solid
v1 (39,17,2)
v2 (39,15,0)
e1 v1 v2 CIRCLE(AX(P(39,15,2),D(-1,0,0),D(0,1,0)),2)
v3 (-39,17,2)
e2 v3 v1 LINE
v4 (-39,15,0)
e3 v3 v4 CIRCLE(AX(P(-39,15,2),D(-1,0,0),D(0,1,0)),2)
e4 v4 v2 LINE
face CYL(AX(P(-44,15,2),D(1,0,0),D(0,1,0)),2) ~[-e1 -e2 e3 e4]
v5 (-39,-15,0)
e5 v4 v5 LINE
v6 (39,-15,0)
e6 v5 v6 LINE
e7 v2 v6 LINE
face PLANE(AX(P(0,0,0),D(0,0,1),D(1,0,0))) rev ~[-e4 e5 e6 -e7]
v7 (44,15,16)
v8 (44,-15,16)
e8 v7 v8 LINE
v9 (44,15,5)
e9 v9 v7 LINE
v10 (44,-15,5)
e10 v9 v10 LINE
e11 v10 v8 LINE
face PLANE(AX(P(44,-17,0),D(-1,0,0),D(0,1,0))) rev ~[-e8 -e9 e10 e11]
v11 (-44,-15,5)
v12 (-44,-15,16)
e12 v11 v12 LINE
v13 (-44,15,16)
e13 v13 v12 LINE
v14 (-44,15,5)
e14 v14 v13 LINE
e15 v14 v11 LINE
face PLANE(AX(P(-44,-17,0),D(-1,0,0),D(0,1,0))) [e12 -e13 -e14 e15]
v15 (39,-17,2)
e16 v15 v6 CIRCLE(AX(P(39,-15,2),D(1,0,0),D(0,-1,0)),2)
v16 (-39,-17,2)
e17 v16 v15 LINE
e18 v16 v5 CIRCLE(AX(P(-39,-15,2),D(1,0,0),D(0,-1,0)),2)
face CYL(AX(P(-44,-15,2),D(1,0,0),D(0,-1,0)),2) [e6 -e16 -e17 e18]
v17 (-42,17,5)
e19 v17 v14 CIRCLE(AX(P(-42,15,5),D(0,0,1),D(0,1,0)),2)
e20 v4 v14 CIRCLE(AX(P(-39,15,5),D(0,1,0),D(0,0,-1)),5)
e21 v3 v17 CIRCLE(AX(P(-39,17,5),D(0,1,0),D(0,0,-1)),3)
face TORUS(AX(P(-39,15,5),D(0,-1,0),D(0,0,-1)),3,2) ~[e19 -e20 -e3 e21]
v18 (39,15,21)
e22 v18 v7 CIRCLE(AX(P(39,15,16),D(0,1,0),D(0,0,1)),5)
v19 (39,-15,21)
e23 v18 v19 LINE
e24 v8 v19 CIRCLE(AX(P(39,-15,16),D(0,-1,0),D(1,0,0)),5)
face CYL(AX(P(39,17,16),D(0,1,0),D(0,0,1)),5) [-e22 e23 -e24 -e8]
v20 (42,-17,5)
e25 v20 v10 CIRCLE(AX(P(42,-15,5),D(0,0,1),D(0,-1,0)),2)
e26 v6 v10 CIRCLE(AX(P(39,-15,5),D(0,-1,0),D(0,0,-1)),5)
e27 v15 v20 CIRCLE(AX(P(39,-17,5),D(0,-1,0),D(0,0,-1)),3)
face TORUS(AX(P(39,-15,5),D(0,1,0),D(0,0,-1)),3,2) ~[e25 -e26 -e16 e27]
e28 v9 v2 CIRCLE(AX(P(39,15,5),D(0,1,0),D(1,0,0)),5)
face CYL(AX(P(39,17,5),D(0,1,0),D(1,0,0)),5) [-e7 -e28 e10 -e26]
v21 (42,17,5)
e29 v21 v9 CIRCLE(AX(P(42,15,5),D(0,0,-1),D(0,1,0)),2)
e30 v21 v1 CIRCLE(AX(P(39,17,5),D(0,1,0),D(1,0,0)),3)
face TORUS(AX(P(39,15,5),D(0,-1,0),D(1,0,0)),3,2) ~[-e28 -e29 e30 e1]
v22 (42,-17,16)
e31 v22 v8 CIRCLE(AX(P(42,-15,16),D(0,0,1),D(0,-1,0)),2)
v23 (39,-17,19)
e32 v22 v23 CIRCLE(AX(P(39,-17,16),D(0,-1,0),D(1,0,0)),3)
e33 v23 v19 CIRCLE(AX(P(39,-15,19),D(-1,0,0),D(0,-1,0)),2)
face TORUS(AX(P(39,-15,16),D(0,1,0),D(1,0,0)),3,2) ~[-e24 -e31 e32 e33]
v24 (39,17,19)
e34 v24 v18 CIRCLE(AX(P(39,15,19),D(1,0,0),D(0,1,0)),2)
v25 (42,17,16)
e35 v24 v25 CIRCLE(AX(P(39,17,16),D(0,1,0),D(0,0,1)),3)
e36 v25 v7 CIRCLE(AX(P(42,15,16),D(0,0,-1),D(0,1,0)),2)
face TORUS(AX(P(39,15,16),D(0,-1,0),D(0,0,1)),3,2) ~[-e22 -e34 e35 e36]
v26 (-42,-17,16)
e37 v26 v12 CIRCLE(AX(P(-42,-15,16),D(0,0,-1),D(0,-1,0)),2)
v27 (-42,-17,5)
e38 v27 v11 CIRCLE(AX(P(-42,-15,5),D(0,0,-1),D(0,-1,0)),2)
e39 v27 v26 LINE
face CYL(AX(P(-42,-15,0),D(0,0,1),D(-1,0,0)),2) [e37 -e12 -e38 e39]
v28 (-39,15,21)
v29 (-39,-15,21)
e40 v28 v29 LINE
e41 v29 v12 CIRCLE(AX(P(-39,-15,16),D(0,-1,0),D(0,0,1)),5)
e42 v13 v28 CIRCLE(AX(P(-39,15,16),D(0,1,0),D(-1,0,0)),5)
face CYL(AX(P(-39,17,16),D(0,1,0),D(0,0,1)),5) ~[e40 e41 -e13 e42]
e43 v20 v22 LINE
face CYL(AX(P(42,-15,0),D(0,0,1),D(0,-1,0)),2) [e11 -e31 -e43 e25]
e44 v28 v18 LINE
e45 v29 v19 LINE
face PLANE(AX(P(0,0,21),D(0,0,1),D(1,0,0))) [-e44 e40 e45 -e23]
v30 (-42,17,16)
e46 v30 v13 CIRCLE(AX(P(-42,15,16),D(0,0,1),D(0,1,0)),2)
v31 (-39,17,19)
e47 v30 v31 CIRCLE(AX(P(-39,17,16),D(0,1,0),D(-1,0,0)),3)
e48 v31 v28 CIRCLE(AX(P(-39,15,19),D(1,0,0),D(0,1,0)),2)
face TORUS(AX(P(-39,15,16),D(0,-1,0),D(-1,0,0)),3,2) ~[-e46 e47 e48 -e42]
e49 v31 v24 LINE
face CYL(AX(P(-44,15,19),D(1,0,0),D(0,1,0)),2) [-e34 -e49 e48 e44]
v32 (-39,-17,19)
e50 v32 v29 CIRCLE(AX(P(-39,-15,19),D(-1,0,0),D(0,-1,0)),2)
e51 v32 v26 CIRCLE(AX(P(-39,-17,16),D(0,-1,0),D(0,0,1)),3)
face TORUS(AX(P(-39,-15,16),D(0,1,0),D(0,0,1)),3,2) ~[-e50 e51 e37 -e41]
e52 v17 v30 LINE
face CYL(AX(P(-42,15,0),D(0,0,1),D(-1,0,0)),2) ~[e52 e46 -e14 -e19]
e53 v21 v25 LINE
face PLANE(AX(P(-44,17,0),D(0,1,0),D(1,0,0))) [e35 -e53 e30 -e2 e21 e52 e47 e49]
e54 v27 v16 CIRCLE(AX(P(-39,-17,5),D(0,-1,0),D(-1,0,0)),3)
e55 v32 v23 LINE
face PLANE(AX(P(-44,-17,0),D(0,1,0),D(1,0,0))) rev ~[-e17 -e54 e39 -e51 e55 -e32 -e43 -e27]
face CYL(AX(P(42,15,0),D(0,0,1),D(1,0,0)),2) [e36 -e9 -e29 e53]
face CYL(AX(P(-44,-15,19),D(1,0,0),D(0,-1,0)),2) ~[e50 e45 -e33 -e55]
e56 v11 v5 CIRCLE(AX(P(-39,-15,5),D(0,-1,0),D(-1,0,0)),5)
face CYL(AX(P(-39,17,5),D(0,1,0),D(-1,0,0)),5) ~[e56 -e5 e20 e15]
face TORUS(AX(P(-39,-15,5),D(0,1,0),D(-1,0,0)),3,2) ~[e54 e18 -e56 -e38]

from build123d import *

# Parameters (mm, degrees)
F0_W         = 88
F0_H         = 34
F1_DEPTH     = 21
F2_R         = 2
F3_T1_DEPTH  = 34
F3_T4_ANGLE  = 90
F3_T6_ANGLE  = 90
F3_T8_ANGLE  = 90
F3_T10_ANGLE = 90
F3_T12_ANGLE = 90
F3_T14_ANGLE = 90
F3_T16_ANGLE = 90
F3_T18_ANGLE = 90


# Not quite as in the source:
# - a fillet or chamfer that OpenCascade refuses, or shapes differently, is made with other operations: its cross-section is extruded or revolved along the edge and cut away or added


with BuildPart() as f1:
    # F0 (on Top) → F1 (new body)
    with BuildSketch(Plane.XY):
        Rectangle(F0_W, F0_H)
    extrude(amount=F1_DEPTH)

    # F2
    f2_edges = [f1.edges().sort_by_distance(p)[0] for p in [
        (0, -17, 21),
        (0, -17, 0),
        (0, 17, 21),
        (0, 17, 0),
        (-44, 17, 10.5),
        (-44, -17, 10.5),
        (44, 17, 10.5),
        (44, -17, 10.5),
    ]]
    fillet(f2_edges, radius=F2_R)

    # F3: fillet of radius 5 on 4 edges, made by hand

    # F3_s2 → F3_t1 (cut)
    with BuildSketch(Plane.XZ.offset(-17)):
        with BuildLine():
            ThreePointArc((44, 5), (42.5355339059, 1.4644660941), (39, 0))
            Line((39, 0), (44, 0))
            Line((44, 0), (44, 5))
        make_face()
        with BuildLine():
            ThreePointArc((39, 21), (42.5355339059, 19.5355339059), (44, 16))
            Line((44, 16), (44, 21))
            Line((44, 21), (39, 21))
        make_face()
        with BuildLine():
            ThreePointArc((-44, 5), (-42.5355339059, 1.4644660941), (-39, 0))
            Line((-39, 0), (-44, 0))
            Line((-44, 0), (-44, 5))
        make_face()
        with BuildLine():
            ThreePointArc((-39, 21), (-42.5355339059, 19.5355339059), (-44, 16))
            Line((-44, 16), (-44, 21))
            Line((-44, 21), (-39, 21))
        make_face()
    extrude(amount=F3_T1_DEPTH, mode=Mode.SUBTRACT)

    # F3_s3 → F3_t4 (revolve, cut)
    with BuildSketch(Plane.XY.offset(16)):
        with BuildLine():
            ThreePointArc((-42, 17), (-43.4142135624, 16.4142135624), (-44, 15))
            Line((-44, 15), (-44, 17))
            Line((-44, 17), (-42, 17))
        make_face()
    revolve(axis=Axis((-39, 17, 16), (0, 1, 0)), revolution_arc=F3_T4_ANGLE, mode=Mode.SUBTRACT)

    # F3_s5 → F3_t6 (revolve, cut)
    with BuildSketch(Plane.YZ.offset(-39)):
        with BuildLine():
            ThreePointArc((-17, 19), (-16.4142135624, 20.4142135624), (-15, 21))
            Line((-15, 21), (-17, 21))
            Line((-17, 21), (-17, 19))
        make_face()
    revolve(axis=Axis((-39, -17, 16), (0, -1, 0)), revolution_arc=F3_T6_ANGLE, mode=Mode.SUBTRACT)

    # F3_s7 → F3_t8 (revolve, cut)
    with BuildSketch(Plane.YZ.offset(-39)):
        with BuildLine():
            ThreePointArc((17, 2), (16.4142135624, 0.5857864376), (15, 0))
            Line((15, 0), (17, 0))
            Line((17, 0), (17, 2))
        make_face()
    revolve(axis=Axis((-39, 17, 5), (0, 1, 0)), revolution_arc=F3_T8_ANGLE, mode=Mode.SUBTRACT)

    # F3_s9 → F3_t10 (revolve, cut)
    with BuildSketch(Plane.XY.offset(5)):
        with BuildLine():
            ThreePointArc((-42, -17), (-43.4142135624, -16.4142135624), (-44, -15))
            Line((-44, -15), (-44, -17))
            Line((-44, -17), (-42, -17))
        make_face()
    revolve(axis=Axis((-39, -17, 5), (0, -1, 0)), revolution_arc=F3_T10_ANGLE, mode=Mode.SUBTRACT)

    # F3_s11 → F3_t12 (revolve, cut)
    with BuildSketch(Plane.XY.offset(16)):
        with BuildLine():
            ThreePointArc((42, -17), (43.4142135624, -16.4142135624), (44, -15))
            Line((44, -15), (44, -17))
            Line((44, -17), (42, -17))
        make_face()
    revolve(axis=Axis((39, -17, 16), (0, -1, 0)), revolution_arc=F3_T12_ANGLE, mode=Mode.SUBTRACT)

    # F3_s13 → F3_t14 (revolve, cut)
    with BuildSketch(Plane.YZ.offset(39)):
        with BuildLine():
            ThreePointArc((17, 19), (16.4142135624, 20.4142135624), (15, 21))
            Line((15, 21), (17, 21))
            Line((17, 21), (17, 19))
        make_face()
    revolve(axis=Axis((39, 17, 16), (0, 1, 0)), revolution_arc=F3_T14_ANGLE, mode=Mode.SUBTRACT)

    # F3_s15 → F3_t16 (revolve, cut)
    with BuildSketch(Plane.YZ.offset(39)):
        with BuildLine():
            ThreePointArc((-17, 2), (-16.4142135624, 0.5857864376), (-15, 0))
            Line((-15, 0), (-17, 0))
            Line((-17, 0), (-17, 2))
        make_face()
    revolve(axis=Axis((39, -17, 5), (0, -1, 0)), revolution_arc=F3_T16_ANGLE, mode=Mode.SUBTRACT)

    # F3_s17 → F3_t18 (revolve, cut)
    with BuildSketch(Plane.XY.offset(5)):
        with BuildLine():
            ThreePointArc((42, 17), (43.4142135624, 16.4142135624), (44, 15))
            Line((44, 15), (44, 17))
            Line((44, 17), (42, 17))
        make_face()
    revolve(axis=Axis((39, 17, 5), (0, 1, 0)), revolution_arc=F3_T18_ANGLE, mode=Mode.SUBTRACT)


solid = f1.part
